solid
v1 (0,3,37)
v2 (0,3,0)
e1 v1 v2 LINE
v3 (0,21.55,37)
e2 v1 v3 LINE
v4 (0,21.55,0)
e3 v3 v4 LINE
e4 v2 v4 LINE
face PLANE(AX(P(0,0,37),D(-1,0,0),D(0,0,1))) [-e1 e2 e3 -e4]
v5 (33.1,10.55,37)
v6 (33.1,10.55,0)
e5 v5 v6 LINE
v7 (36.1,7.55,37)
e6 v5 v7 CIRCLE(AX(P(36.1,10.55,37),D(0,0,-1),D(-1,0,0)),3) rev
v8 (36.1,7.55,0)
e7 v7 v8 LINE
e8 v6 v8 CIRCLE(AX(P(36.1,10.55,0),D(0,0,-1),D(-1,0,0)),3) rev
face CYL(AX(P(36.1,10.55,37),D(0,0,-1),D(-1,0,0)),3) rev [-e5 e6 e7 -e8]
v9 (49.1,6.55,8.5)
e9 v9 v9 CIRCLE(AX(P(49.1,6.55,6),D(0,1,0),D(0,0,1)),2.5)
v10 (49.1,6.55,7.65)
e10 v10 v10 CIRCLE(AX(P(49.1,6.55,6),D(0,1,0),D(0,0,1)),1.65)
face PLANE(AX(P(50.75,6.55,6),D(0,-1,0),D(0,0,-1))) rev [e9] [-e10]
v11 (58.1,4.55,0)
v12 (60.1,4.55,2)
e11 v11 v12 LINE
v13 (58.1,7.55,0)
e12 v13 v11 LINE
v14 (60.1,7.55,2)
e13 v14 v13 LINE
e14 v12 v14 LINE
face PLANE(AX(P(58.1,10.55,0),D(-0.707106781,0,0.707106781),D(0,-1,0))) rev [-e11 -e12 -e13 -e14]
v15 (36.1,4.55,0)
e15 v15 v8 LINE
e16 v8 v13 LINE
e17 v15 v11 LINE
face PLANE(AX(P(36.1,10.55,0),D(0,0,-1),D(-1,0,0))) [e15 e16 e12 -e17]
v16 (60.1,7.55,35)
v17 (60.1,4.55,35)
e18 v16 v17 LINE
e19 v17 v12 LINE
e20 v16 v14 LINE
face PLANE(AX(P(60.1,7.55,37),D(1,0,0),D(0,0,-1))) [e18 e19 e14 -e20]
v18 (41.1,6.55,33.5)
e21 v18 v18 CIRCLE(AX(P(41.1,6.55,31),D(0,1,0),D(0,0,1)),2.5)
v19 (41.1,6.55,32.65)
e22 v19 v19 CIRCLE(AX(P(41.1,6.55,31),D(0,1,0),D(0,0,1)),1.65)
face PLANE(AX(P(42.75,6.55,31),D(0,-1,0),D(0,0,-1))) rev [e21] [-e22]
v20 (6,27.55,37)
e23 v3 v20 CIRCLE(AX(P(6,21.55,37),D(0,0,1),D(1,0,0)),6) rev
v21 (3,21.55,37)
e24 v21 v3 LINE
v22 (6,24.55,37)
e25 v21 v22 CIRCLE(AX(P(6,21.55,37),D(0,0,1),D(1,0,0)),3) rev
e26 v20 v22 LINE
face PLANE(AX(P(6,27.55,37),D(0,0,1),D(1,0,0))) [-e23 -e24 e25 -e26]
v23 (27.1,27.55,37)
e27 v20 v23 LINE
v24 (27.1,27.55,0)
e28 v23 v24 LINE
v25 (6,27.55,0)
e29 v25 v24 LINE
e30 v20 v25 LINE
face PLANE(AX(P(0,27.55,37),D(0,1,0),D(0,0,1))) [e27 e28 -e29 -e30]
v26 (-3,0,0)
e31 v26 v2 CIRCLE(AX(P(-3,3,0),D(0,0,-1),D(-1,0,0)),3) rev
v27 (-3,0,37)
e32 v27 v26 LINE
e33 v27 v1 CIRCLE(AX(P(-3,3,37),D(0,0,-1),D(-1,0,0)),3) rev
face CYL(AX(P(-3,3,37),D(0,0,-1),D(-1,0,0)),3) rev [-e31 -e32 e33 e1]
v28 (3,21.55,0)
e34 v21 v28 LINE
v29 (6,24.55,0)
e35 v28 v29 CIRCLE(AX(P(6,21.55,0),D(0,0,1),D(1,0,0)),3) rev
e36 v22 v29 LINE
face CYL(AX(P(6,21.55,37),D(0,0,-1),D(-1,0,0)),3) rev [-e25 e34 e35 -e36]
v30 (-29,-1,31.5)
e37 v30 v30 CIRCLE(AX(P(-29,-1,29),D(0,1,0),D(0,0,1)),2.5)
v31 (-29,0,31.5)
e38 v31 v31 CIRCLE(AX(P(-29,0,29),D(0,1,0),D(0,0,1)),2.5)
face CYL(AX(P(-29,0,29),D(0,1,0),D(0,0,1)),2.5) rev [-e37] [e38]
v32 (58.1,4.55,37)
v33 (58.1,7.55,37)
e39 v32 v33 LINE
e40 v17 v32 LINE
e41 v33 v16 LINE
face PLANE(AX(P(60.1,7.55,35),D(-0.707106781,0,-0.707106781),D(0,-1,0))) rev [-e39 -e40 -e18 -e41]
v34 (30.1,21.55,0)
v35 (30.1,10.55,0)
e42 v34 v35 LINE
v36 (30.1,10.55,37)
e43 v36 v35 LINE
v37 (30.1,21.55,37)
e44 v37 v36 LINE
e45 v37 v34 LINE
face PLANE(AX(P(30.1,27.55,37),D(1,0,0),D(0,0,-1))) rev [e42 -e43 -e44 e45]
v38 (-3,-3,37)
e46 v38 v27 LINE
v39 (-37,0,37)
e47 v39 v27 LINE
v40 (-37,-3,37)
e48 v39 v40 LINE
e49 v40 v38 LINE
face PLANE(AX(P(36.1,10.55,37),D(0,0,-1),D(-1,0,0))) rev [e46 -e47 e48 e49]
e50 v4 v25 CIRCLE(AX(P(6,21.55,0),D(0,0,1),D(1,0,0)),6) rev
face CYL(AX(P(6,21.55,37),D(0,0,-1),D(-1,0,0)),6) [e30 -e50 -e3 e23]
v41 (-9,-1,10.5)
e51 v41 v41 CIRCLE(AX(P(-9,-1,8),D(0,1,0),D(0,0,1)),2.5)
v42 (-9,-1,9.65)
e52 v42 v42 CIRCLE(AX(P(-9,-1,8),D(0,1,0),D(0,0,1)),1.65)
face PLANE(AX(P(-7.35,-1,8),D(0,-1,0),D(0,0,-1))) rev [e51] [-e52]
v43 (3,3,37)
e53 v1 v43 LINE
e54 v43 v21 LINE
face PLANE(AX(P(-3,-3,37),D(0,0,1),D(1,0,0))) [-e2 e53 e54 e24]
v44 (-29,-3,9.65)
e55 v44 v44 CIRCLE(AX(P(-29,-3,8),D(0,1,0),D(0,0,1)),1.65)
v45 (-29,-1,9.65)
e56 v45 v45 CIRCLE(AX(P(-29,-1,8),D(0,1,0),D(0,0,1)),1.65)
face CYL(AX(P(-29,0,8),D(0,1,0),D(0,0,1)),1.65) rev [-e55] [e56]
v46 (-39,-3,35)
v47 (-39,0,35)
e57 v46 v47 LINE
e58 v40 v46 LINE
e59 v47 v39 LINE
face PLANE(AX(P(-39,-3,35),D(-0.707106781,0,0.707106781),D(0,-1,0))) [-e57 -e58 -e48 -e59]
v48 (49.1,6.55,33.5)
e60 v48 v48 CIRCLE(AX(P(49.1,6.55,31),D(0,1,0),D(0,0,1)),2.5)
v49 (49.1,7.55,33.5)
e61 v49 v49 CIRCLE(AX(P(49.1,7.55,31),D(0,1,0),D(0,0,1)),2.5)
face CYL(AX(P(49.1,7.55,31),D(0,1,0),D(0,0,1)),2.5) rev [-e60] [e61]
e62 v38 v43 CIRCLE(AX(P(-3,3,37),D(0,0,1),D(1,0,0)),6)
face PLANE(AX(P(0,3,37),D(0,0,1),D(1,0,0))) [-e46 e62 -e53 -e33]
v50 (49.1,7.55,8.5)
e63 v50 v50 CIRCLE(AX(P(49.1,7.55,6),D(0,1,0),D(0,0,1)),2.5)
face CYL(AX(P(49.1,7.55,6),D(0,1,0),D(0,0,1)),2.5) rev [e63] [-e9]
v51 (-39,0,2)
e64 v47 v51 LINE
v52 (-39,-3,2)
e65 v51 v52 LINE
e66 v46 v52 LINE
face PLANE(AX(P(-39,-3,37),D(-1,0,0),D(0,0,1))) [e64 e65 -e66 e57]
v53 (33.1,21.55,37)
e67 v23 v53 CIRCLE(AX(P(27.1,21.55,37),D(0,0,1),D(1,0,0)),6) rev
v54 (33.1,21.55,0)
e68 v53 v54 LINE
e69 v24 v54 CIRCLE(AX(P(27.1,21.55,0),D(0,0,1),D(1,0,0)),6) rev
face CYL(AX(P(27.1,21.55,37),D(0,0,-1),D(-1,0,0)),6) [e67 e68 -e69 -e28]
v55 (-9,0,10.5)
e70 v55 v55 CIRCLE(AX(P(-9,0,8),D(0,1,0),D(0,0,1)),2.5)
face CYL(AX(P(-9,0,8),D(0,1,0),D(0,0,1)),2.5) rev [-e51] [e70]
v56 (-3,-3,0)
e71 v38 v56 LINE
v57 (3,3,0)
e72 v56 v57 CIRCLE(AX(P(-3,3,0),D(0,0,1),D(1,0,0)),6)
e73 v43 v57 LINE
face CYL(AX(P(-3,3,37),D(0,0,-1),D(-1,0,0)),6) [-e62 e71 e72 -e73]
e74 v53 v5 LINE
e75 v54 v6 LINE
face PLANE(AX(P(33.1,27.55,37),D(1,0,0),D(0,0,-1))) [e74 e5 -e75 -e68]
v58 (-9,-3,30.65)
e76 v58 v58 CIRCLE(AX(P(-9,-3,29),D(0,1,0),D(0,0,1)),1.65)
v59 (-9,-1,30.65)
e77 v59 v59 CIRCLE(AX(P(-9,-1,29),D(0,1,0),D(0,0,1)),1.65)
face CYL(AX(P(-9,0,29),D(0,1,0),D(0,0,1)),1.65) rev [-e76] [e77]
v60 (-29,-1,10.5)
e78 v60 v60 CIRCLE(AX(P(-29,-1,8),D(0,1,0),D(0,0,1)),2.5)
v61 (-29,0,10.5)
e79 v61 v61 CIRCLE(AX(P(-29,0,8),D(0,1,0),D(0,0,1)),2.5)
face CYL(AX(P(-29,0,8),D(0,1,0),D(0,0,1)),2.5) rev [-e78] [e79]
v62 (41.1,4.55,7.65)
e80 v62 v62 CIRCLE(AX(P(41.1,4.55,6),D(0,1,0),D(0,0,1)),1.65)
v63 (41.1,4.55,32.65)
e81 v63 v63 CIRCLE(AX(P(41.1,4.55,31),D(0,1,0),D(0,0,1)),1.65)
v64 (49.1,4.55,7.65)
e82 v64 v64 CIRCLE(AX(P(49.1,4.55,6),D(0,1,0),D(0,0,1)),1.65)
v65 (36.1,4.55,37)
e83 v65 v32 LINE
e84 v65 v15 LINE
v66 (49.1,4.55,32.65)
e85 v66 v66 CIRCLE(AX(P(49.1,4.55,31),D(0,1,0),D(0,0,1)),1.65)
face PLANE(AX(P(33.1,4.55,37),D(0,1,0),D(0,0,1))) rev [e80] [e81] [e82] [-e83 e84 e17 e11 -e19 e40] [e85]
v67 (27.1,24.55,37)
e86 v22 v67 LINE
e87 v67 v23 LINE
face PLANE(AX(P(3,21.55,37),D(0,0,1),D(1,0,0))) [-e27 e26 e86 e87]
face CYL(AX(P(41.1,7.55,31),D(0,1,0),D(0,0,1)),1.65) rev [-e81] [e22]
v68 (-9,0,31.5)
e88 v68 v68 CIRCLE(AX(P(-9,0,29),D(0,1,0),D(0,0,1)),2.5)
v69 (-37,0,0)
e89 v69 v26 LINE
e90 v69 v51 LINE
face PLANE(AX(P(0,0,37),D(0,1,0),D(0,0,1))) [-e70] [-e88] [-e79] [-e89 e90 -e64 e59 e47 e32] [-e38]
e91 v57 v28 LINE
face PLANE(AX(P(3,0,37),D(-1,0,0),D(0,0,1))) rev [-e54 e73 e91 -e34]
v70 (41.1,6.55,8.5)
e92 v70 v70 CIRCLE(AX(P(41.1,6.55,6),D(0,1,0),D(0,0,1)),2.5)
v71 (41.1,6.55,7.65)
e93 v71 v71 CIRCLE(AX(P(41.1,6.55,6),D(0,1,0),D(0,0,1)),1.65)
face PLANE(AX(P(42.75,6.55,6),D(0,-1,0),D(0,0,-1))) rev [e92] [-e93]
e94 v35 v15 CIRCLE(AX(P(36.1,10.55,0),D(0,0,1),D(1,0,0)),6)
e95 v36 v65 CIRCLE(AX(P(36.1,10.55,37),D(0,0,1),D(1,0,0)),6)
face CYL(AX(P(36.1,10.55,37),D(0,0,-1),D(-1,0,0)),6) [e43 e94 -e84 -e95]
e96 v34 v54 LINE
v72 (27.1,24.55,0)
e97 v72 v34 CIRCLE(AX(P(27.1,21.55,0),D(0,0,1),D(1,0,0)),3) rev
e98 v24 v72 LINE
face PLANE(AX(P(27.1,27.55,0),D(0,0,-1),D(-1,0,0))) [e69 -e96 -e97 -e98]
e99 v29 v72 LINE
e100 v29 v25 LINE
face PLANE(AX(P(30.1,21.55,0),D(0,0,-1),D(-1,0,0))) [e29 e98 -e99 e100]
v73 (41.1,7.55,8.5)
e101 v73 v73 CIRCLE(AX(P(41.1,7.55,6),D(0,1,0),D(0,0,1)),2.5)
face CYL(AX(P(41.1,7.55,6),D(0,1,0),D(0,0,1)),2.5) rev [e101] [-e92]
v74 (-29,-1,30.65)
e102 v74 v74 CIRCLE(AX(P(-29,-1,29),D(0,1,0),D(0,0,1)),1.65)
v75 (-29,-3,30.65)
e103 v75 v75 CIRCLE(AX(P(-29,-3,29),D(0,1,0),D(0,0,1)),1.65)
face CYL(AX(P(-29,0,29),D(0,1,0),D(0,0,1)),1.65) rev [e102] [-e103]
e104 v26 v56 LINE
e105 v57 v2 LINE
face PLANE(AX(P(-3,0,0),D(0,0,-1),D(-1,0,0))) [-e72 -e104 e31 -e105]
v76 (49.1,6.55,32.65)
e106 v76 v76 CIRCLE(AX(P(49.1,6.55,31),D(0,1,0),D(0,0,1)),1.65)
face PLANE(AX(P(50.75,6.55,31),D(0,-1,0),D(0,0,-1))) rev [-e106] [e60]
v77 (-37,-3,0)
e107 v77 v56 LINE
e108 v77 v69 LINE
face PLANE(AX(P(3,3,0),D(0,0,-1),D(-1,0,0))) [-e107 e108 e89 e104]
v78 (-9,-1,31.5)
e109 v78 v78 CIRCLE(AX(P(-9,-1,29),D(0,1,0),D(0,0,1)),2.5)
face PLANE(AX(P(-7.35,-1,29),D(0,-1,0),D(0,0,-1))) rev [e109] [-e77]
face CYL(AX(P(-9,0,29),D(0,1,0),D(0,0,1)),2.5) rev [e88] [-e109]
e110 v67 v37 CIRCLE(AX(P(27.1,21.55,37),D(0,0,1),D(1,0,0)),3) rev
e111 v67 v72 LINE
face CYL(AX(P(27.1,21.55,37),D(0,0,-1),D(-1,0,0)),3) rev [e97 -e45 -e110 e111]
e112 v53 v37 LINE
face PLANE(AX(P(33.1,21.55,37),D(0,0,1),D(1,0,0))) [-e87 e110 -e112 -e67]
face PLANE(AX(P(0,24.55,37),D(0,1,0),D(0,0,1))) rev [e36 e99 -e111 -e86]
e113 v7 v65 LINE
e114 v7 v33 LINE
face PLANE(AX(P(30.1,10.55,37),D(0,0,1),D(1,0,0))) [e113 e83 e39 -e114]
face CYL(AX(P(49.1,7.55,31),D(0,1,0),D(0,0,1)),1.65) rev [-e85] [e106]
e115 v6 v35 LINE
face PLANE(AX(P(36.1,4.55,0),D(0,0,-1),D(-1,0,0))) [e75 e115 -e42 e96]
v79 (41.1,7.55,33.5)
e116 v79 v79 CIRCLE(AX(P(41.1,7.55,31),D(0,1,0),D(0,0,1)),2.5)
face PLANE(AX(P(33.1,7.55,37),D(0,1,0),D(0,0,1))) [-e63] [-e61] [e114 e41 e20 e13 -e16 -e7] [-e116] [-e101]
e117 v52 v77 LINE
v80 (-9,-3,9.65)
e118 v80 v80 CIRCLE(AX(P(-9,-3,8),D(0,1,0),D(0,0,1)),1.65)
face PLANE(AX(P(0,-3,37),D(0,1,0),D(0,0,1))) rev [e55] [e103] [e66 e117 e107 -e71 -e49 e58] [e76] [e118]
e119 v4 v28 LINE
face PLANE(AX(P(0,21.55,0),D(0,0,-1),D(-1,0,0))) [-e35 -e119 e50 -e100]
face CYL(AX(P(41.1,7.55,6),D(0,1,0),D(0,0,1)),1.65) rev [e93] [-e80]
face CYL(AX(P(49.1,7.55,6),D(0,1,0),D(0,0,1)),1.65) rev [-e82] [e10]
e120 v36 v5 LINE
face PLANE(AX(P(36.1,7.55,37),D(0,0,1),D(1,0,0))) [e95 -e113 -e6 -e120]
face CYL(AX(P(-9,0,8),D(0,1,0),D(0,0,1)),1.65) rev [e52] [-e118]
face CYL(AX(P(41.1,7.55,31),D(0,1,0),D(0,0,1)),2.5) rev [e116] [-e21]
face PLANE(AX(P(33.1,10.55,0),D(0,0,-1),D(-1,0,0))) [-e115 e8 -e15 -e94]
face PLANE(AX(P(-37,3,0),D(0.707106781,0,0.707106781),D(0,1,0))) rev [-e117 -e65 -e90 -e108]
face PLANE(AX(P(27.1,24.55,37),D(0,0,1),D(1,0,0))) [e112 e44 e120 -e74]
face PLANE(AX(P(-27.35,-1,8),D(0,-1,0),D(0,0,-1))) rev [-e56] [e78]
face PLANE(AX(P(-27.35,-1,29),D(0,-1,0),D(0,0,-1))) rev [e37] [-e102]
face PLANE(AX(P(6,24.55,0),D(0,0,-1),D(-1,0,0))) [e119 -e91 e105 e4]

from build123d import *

# Parameters (mm, degrees)
SM_BASE_FLANGE_1_DEPTH    = 37
CHAMFER_1_SIZE            = 2
HOLE_WIZARD_1_D           = 3.3
HOLE_WIZARD_1_DEPTH       = 3
HOLE_WIZARD_1_CBORE_D     = 5
HOLE_WIZARD_1_CBORE_DEPTH = 1
HOLE_WIZARD_1_TIP         = 0.991420021
HOLE_WIZARD_2_D           = 3.3
HOLE_WIZARD_2_DEPTH       = 3
HOLE_WIZARD_2_CBORE_D     = 5
HOLE_WIZARD_2_CBORE_DEPTH = 1
HOLE_WIZARD_2_TIP         = 0.991420021


# Sheet-metal steps are written as plain solids
with BuildPart() as part:
    # Sketch 1 → 基体-法兰1 (new body)
    with BuildSketch(Plane.XY):
        with BuildLine():
            Line((60.1, 7.55), (36.1, 7.55))
            ThreePointArc((36.1, 7.55), (33.978679656, 8.428679656), (33.1, 10.55))
            Line((33.1, 10.55), (33.1, 21.55))
            ThreePointArc((33.1, 21.55), (31.342640687, 25.792640687), (27.1, 27.55))
            Line((27.1, 27.55), (6, 27.55))
            ThreePointArc((6, 27.55), (1.757359313, 25.792640687), (0, 21.55))
            Line((0, 21.55), (0, 3))
            ThreePointArc((0, 3), (-0.878679656, 0.878679656), (-3, 0))
            Line((-3, 0), (-39, 0))
            Line((-39, 0), (-39, -3))
            Line((-39, -3), (-3, -3))
            ThreePointArc((-3, -3), (1.242640687, -1.242640687), (3, 3))
            Line((3, 3), (3, 21.55))
            ThreePointArc((3, 21.55), (3.878679656, 23.671320344), (6, 24.55))
            Line((6, 24.55), (27.1, 24.55))
            ThreePointArc((27.1, 24.55), (29.221320344, 23.671320344), (30.1, 21.55))
            Line((30.1, 21.55), (30.1, 10.55))
            ThreePointArc((30.1, 10.55), (31.857359313, 6.307359313), (36.1, 4.55))
            Line((36.1, 4.55), (60.1, 4.55))
            Line((60.1, 4.55), (60.1, 7.55))
        make_face()
    extrude(amount=SM_BASE_FLANGE_1_DEPTH)

    # 倒角1
    chamfer_1_edges = [part.edges().sort_by_distance(p)[0] for p in [
        (-39, -1.5, 0),
        (60.1, 6.05, 0),
        (-39, -1.5, 37),
        (60.1, 6.05, 37),
    ]]
    chamfer(chamfer_1_edges, length=CHAMFER_1_SIZE)

    # 打孔尺寸(%根据)内六角圆柱头螺钉的类型1
    with Locations(Plane(origin=(0, 7.55, 0), x_dir=(1, 0, 0), z_dir=(0, 1, 0))):
        with Locations((49.1, -6), (49.1, -31), (41.1, -31), (41.1, -6)):
            CounterBoreHole(HOLE_WIZARD_1_D / 2, HOLE_WIZARD_1_CBORE_D / 2, HOLE_WIZARD_1_CBORE_DEPTH, depth=HOLE_WIZARD_1_DEPTH)
            with Locations((0, 0, -(HOLE_WIZARD_1_DEPTH + HOLE_WIZARD_1_TIP / 2))):  # 118° drill point
                Cone(0, HOLE_WIZARD_1_D / 2, HOLE_WIZARD_1_TIP, mode=Mode.SUBTRACT)

    # 打孔尺寸(%根据)内六角圆柱头螺钉的类型2
    with Locations(Plane(origin=(0, 0, 0), x_dir=(1, 0, 0), z_dir=(0, 1, 0))):
        with Locations((-29, -8), (-9, -8), (-9, -29), (-29, -29)):
            CounterBoreHole(HOLE_WIZARD_2_D / 2, HOLE_WIZARD_2_CBORE_D / 2, HOLE_WIZARD_2_CBORE_DEPTH, depth=HOLE_WIZARD_2_DEPTH)
            with Locations((0, 0, -(HOLE_WIZARD_2_DEPTH + HOLE_WIZARD_2_TIP / 2))):  # 118° drill point
                Cone(0, HOLE_WIZARD_2_D / 2, HOLE_WIZARD_2_TIP, mode=Mode.SUBTRACT)


solid = part.part
